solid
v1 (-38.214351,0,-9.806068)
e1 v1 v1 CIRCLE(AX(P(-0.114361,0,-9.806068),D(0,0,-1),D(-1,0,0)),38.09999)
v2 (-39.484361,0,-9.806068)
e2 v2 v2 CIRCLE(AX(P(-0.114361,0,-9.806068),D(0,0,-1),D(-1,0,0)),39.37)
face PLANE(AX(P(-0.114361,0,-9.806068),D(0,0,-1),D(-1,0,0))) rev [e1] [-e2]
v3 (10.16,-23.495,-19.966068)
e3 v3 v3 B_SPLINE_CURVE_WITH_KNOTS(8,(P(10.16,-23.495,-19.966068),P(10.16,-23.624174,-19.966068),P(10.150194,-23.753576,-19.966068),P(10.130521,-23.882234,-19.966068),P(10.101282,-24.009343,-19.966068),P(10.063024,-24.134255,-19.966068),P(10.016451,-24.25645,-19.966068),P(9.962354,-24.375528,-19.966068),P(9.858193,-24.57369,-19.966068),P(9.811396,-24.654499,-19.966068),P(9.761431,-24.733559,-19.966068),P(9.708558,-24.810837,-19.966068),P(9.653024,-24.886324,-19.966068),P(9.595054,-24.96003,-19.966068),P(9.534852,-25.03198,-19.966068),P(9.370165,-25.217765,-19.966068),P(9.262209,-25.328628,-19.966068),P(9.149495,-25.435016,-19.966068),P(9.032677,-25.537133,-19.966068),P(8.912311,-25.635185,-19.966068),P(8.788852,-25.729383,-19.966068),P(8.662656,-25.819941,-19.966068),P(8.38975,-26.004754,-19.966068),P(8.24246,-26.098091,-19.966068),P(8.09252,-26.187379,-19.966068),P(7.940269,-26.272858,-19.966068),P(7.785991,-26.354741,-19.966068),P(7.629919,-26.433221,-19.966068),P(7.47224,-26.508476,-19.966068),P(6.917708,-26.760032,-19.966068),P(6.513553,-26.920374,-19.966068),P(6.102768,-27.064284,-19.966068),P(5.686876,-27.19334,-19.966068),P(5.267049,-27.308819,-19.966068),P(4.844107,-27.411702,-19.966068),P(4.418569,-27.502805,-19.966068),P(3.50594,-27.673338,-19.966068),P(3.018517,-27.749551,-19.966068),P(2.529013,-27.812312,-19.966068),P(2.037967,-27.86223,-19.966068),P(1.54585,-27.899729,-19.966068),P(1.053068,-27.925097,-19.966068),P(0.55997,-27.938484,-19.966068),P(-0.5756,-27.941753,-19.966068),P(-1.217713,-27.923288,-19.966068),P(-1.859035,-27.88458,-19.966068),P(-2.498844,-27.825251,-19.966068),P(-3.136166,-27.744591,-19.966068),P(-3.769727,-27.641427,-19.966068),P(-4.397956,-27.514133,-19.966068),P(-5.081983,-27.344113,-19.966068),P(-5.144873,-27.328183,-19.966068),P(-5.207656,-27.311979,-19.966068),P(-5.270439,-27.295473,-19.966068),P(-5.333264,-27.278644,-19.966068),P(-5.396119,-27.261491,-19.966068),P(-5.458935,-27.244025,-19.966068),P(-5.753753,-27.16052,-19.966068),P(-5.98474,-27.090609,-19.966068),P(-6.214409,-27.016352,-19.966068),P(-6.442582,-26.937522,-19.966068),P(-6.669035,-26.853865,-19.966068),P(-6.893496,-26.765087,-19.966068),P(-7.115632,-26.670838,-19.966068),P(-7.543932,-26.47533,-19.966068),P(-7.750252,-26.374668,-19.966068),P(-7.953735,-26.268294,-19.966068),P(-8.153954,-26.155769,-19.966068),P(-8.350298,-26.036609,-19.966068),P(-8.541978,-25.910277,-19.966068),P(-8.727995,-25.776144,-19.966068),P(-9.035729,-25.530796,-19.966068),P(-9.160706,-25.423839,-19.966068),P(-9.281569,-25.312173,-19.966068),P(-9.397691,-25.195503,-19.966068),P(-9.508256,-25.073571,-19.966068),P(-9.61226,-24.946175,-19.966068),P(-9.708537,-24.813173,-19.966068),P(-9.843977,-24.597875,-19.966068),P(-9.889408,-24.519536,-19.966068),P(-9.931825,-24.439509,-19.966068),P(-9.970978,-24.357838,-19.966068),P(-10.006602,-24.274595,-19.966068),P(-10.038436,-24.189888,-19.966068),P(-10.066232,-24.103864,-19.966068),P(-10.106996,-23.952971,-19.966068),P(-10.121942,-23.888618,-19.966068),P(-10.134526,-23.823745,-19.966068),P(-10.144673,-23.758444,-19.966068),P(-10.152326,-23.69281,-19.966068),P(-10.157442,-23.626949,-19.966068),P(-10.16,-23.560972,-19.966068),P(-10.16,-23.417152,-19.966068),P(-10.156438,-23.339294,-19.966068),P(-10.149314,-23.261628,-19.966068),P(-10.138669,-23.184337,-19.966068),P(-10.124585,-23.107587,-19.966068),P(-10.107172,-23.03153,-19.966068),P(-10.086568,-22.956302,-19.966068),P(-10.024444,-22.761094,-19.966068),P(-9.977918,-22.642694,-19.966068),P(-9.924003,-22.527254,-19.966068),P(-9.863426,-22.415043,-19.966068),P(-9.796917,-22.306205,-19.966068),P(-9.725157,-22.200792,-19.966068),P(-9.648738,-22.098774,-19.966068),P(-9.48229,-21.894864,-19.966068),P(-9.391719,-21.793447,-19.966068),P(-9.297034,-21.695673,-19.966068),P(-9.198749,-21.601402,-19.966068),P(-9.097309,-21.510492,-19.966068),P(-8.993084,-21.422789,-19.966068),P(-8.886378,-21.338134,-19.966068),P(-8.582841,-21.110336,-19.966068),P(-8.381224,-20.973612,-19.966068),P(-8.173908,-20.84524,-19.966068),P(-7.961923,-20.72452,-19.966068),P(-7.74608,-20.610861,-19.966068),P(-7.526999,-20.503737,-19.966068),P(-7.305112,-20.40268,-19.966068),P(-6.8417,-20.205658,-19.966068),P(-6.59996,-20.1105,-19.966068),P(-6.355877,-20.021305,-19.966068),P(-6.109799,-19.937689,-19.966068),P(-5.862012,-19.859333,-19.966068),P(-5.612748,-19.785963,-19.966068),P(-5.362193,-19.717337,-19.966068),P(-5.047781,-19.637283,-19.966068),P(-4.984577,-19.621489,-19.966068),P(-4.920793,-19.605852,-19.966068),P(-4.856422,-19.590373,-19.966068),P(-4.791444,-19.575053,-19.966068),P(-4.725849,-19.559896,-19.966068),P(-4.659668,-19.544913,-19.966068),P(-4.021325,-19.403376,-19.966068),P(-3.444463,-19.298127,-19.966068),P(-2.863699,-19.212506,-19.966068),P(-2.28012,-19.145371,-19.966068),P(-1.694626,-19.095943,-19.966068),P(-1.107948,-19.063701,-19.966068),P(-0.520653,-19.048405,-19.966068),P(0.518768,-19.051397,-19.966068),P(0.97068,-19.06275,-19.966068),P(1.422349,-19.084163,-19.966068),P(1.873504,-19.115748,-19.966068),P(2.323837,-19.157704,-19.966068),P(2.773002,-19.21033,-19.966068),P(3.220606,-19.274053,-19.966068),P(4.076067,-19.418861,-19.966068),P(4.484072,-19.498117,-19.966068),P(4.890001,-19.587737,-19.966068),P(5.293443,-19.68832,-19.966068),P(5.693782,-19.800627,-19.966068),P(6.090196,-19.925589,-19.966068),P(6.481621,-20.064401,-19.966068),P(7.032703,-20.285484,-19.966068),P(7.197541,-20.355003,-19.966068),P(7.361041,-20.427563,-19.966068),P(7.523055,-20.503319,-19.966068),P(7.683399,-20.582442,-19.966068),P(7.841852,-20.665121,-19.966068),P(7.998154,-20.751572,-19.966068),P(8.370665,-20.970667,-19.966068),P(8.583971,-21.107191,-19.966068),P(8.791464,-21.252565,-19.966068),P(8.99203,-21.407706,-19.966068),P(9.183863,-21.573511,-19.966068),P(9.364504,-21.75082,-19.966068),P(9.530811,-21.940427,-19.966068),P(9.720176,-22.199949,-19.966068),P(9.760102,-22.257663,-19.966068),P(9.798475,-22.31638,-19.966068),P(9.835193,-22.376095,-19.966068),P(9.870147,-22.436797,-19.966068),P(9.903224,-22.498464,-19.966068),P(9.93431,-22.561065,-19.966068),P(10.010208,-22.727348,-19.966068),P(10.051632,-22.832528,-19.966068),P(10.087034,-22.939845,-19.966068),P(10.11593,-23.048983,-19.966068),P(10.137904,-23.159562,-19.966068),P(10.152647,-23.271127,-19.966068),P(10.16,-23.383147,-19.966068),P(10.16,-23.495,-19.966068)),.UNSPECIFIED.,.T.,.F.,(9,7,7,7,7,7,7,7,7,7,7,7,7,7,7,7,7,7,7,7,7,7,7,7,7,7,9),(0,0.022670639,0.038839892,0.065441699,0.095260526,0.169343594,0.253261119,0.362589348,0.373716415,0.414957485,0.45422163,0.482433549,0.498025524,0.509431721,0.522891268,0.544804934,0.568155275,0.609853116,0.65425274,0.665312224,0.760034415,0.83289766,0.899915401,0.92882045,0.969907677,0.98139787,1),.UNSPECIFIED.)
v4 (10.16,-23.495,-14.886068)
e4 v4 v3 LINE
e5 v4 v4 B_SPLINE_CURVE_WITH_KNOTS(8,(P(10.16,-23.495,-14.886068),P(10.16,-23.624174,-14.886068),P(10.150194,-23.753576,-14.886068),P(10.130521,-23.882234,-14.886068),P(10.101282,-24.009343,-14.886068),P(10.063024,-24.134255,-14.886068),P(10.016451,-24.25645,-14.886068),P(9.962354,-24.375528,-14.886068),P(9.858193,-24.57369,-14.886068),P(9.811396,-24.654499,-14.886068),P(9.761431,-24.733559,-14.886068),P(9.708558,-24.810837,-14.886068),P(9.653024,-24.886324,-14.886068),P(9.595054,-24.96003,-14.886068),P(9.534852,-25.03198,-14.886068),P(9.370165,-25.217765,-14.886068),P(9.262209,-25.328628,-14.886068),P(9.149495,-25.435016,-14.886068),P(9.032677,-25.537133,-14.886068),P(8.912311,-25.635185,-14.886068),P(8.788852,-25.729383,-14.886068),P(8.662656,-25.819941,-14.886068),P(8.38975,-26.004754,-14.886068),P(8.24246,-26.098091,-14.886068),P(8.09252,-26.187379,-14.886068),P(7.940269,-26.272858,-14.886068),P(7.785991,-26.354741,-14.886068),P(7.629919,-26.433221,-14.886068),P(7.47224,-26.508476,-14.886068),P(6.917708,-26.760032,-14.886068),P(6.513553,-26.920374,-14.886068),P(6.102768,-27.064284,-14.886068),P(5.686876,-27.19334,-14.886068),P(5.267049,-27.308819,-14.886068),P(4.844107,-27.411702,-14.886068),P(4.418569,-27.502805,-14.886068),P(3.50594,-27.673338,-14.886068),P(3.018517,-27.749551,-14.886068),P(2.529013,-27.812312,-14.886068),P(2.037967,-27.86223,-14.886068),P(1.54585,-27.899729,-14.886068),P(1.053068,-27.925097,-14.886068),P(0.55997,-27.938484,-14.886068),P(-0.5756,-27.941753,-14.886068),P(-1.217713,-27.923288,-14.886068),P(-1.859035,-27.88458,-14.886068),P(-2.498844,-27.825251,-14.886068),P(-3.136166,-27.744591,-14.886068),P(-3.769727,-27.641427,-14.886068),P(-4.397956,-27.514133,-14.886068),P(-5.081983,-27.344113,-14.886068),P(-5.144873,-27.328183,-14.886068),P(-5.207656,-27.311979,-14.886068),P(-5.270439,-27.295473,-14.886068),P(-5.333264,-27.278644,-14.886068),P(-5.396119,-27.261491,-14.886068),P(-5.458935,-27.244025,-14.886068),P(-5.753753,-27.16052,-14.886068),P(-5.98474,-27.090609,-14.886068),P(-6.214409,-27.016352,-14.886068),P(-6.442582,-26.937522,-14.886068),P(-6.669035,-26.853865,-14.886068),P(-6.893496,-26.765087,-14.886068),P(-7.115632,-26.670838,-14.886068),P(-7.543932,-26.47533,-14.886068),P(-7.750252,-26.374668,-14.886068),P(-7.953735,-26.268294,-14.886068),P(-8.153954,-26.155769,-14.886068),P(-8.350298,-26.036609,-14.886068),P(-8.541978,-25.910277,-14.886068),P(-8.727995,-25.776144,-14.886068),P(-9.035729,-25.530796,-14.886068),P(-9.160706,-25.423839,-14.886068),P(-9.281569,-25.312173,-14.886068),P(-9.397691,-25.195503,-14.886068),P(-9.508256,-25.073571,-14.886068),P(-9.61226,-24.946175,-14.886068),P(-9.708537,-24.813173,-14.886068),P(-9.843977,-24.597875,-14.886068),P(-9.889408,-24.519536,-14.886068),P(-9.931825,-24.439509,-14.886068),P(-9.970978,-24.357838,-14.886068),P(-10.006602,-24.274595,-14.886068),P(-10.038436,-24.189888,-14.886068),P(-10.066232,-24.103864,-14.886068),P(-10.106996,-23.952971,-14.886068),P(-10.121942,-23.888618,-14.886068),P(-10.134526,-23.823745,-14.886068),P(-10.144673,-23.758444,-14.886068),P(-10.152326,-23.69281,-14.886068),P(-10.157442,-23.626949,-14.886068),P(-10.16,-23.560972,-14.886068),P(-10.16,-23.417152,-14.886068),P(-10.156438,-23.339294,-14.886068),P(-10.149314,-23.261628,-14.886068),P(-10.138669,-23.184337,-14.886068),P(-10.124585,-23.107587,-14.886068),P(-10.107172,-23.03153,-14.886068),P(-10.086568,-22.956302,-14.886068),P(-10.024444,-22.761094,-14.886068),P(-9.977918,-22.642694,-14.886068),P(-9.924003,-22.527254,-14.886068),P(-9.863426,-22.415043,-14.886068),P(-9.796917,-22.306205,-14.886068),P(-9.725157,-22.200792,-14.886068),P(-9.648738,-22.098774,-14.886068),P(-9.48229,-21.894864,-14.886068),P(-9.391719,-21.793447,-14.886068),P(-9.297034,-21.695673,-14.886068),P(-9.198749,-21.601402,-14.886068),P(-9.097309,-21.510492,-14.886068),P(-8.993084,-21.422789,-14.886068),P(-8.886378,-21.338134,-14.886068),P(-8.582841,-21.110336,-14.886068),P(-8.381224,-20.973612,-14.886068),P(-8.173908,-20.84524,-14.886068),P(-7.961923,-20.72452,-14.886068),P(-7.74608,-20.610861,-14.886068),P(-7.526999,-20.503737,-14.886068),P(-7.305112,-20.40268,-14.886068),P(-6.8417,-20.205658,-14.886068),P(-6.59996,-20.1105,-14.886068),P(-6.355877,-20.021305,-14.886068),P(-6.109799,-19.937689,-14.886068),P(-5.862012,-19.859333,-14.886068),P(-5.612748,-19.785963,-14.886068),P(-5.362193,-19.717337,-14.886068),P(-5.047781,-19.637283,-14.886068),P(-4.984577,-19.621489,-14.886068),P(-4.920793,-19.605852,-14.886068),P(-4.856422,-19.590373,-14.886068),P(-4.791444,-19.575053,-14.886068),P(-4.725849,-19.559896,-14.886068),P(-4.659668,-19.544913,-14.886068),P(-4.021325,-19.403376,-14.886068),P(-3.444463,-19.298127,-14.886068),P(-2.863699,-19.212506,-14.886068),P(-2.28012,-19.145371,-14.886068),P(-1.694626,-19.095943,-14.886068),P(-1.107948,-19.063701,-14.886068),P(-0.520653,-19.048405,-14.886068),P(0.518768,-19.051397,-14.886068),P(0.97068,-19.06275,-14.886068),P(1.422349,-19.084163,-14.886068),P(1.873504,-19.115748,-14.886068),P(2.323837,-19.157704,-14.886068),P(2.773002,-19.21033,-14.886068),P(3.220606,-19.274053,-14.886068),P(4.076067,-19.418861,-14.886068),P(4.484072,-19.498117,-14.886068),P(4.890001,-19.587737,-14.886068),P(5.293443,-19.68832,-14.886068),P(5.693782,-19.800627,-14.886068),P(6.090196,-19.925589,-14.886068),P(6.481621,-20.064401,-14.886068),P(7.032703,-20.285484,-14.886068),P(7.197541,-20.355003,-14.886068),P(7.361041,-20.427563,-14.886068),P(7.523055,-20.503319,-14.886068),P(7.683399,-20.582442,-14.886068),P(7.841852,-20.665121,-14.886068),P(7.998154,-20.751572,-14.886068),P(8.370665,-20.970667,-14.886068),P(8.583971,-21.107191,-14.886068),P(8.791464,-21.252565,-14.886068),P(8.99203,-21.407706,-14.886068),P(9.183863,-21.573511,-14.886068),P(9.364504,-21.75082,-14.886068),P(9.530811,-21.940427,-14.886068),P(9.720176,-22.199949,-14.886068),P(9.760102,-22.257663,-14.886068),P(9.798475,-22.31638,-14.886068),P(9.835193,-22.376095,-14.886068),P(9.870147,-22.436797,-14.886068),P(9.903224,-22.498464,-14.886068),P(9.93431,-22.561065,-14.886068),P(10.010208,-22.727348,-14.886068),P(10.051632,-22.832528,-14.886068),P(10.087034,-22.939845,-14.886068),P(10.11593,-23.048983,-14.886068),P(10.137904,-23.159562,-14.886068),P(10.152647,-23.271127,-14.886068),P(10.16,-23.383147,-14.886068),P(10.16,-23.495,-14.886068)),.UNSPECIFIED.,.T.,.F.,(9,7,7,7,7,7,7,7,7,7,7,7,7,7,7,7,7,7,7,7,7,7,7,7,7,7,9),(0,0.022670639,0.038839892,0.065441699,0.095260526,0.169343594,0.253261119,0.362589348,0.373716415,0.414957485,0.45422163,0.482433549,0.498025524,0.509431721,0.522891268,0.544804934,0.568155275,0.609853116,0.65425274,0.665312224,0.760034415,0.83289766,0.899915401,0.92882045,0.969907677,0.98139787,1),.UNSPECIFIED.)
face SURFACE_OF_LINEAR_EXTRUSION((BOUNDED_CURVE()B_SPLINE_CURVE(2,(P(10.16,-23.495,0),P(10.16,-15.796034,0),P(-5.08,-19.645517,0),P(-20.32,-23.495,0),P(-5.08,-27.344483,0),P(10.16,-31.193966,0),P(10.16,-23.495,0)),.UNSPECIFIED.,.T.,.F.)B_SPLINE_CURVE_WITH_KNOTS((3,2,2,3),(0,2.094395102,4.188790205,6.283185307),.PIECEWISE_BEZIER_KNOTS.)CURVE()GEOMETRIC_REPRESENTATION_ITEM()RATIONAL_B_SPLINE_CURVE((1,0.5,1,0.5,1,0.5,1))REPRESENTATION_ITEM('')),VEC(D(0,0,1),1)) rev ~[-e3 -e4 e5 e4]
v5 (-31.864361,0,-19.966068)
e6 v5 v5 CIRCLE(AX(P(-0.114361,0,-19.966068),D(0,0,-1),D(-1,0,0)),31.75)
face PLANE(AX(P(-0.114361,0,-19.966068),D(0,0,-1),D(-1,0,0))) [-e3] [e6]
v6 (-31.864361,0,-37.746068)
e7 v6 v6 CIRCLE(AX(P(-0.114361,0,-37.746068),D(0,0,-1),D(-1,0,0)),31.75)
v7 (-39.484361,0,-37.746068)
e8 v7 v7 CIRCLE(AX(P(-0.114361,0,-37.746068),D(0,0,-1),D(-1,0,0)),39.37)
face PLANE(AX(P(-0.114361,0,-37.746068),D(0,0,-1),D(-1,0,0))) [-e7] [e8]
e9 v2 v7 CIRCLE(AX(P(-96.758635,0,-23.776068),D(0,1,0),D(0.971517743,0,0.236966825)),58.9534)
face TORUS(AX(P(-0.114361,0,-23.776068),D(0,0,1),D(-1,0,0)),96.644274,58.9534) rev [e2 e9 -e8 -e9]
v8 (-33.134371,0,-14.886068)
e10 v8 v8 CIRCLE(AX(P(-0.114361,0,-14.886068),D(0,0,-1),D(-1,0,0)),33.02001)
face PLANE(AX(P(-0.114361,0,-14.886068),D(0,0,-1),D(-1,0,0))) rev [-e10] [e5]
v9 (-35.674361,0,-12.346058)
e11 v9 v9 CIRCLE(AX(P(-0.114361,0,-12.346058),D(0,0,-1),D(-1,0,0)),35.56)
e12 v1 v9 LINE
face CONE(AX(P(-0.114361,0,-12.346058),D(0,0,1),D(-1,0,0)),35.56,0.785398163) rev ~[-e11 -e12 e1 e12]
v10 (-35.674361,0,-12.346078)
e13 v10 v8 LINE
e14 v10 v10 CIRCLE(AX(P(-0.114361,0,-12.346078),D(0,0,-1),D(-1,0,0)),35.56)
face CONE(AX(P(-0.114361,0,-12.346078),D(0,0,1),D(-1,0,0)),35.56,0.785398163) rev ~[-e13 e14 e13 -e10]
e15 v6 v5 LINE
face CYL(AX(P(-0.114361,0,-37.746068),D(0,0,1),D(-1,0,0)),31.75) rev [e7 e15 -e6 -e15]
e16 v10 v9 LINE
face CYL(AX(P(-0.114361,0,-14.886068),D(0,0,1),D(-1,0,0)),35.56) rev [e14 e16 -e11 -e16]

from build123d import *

# Parameters (mm, degrees)
F3_DEPTH = 65.786
F4_SIZE  = 2.53999


# Not quite as in the source:
# - a fillet or chamfer is up to 0.001 mm smaller than in the source, because OpenCascade refuses the exact size


with BuildPart() as f1:
    # F0 (on Front) → F1 (revolve)
    with BuildSketch(Plane.XZ):
        with BuildLine():
            Line((-39.4843606797, -37.7460680902), (-31.8643606797, -37.7460680902))
            Line((-31.8643606797, -37.7460680902), (-31.8643606797, -19.9660680902))
            Line((-31.8643606797, -19.9660680902), (-0.1143606797, -19.9660680902))
            Line((-0.1143606797, -19.9660680902), (-0.1143606797, -14.8860680902))
            Line((-0.1143606797, -14.8860680902), (-35.6743606797, -14.8860680902))
            Line((-35.6743606797, -14.8860680902), (-35.6743606797, -9.8060680902))
            Line((-35.6743606797, -9.8060680902), (-39.4843606797, -9.8060680902))
            ThreePointArc((-39.4843606797, -9.8060680902), (-37.8052347612, -23.7760680902), (-39.4843606797, -37.7460680902))
        make_face()
    revolve(axis=Axis((-0.1143606797, 0, -17.4260680902), (0, 0, -1)))

    # F2 (on Top) → F3 (cut)
    with BuildSketch(Plane.XY):
        with BuildLine():
            add(Edge.make_bspline(
                [(10.16, -23.495), (10.16, -15.7960341604), (-5.08, -19.6455170802), (-20.32, -23.495), (-5.08, -27.3444829198), (10.16, -31.1939658396), (10.16, -23.495)],
                knots=[0, 0, 0, 2.0943951024, 2.0943951024, 4.1887902048, 4.1887902048, 6.2831853072, 6.2831853072, 6.2831853072], degree=2, weights=[1, 0.5, 1, 0.5, 1, 0.5, 1]))
        make_face()
    extrude(amount=-F3_DEPTH, mode=Mode.SUBTRACT)

    # F4 (size 2.54 in the source; OpenCascade refuses exactly that, so slightly less here)
    f4_edges = [f1.edges().sort_by_distance(p)[0] for p in [
        (35.445639, 0, -14.886068),
        (35.445639, 0, -9.806068),
        (-35.674361, 0, -12.346068),
    ]]
    chamfer(f4_edges, length=F4_SIZE)


solid = f1.part
